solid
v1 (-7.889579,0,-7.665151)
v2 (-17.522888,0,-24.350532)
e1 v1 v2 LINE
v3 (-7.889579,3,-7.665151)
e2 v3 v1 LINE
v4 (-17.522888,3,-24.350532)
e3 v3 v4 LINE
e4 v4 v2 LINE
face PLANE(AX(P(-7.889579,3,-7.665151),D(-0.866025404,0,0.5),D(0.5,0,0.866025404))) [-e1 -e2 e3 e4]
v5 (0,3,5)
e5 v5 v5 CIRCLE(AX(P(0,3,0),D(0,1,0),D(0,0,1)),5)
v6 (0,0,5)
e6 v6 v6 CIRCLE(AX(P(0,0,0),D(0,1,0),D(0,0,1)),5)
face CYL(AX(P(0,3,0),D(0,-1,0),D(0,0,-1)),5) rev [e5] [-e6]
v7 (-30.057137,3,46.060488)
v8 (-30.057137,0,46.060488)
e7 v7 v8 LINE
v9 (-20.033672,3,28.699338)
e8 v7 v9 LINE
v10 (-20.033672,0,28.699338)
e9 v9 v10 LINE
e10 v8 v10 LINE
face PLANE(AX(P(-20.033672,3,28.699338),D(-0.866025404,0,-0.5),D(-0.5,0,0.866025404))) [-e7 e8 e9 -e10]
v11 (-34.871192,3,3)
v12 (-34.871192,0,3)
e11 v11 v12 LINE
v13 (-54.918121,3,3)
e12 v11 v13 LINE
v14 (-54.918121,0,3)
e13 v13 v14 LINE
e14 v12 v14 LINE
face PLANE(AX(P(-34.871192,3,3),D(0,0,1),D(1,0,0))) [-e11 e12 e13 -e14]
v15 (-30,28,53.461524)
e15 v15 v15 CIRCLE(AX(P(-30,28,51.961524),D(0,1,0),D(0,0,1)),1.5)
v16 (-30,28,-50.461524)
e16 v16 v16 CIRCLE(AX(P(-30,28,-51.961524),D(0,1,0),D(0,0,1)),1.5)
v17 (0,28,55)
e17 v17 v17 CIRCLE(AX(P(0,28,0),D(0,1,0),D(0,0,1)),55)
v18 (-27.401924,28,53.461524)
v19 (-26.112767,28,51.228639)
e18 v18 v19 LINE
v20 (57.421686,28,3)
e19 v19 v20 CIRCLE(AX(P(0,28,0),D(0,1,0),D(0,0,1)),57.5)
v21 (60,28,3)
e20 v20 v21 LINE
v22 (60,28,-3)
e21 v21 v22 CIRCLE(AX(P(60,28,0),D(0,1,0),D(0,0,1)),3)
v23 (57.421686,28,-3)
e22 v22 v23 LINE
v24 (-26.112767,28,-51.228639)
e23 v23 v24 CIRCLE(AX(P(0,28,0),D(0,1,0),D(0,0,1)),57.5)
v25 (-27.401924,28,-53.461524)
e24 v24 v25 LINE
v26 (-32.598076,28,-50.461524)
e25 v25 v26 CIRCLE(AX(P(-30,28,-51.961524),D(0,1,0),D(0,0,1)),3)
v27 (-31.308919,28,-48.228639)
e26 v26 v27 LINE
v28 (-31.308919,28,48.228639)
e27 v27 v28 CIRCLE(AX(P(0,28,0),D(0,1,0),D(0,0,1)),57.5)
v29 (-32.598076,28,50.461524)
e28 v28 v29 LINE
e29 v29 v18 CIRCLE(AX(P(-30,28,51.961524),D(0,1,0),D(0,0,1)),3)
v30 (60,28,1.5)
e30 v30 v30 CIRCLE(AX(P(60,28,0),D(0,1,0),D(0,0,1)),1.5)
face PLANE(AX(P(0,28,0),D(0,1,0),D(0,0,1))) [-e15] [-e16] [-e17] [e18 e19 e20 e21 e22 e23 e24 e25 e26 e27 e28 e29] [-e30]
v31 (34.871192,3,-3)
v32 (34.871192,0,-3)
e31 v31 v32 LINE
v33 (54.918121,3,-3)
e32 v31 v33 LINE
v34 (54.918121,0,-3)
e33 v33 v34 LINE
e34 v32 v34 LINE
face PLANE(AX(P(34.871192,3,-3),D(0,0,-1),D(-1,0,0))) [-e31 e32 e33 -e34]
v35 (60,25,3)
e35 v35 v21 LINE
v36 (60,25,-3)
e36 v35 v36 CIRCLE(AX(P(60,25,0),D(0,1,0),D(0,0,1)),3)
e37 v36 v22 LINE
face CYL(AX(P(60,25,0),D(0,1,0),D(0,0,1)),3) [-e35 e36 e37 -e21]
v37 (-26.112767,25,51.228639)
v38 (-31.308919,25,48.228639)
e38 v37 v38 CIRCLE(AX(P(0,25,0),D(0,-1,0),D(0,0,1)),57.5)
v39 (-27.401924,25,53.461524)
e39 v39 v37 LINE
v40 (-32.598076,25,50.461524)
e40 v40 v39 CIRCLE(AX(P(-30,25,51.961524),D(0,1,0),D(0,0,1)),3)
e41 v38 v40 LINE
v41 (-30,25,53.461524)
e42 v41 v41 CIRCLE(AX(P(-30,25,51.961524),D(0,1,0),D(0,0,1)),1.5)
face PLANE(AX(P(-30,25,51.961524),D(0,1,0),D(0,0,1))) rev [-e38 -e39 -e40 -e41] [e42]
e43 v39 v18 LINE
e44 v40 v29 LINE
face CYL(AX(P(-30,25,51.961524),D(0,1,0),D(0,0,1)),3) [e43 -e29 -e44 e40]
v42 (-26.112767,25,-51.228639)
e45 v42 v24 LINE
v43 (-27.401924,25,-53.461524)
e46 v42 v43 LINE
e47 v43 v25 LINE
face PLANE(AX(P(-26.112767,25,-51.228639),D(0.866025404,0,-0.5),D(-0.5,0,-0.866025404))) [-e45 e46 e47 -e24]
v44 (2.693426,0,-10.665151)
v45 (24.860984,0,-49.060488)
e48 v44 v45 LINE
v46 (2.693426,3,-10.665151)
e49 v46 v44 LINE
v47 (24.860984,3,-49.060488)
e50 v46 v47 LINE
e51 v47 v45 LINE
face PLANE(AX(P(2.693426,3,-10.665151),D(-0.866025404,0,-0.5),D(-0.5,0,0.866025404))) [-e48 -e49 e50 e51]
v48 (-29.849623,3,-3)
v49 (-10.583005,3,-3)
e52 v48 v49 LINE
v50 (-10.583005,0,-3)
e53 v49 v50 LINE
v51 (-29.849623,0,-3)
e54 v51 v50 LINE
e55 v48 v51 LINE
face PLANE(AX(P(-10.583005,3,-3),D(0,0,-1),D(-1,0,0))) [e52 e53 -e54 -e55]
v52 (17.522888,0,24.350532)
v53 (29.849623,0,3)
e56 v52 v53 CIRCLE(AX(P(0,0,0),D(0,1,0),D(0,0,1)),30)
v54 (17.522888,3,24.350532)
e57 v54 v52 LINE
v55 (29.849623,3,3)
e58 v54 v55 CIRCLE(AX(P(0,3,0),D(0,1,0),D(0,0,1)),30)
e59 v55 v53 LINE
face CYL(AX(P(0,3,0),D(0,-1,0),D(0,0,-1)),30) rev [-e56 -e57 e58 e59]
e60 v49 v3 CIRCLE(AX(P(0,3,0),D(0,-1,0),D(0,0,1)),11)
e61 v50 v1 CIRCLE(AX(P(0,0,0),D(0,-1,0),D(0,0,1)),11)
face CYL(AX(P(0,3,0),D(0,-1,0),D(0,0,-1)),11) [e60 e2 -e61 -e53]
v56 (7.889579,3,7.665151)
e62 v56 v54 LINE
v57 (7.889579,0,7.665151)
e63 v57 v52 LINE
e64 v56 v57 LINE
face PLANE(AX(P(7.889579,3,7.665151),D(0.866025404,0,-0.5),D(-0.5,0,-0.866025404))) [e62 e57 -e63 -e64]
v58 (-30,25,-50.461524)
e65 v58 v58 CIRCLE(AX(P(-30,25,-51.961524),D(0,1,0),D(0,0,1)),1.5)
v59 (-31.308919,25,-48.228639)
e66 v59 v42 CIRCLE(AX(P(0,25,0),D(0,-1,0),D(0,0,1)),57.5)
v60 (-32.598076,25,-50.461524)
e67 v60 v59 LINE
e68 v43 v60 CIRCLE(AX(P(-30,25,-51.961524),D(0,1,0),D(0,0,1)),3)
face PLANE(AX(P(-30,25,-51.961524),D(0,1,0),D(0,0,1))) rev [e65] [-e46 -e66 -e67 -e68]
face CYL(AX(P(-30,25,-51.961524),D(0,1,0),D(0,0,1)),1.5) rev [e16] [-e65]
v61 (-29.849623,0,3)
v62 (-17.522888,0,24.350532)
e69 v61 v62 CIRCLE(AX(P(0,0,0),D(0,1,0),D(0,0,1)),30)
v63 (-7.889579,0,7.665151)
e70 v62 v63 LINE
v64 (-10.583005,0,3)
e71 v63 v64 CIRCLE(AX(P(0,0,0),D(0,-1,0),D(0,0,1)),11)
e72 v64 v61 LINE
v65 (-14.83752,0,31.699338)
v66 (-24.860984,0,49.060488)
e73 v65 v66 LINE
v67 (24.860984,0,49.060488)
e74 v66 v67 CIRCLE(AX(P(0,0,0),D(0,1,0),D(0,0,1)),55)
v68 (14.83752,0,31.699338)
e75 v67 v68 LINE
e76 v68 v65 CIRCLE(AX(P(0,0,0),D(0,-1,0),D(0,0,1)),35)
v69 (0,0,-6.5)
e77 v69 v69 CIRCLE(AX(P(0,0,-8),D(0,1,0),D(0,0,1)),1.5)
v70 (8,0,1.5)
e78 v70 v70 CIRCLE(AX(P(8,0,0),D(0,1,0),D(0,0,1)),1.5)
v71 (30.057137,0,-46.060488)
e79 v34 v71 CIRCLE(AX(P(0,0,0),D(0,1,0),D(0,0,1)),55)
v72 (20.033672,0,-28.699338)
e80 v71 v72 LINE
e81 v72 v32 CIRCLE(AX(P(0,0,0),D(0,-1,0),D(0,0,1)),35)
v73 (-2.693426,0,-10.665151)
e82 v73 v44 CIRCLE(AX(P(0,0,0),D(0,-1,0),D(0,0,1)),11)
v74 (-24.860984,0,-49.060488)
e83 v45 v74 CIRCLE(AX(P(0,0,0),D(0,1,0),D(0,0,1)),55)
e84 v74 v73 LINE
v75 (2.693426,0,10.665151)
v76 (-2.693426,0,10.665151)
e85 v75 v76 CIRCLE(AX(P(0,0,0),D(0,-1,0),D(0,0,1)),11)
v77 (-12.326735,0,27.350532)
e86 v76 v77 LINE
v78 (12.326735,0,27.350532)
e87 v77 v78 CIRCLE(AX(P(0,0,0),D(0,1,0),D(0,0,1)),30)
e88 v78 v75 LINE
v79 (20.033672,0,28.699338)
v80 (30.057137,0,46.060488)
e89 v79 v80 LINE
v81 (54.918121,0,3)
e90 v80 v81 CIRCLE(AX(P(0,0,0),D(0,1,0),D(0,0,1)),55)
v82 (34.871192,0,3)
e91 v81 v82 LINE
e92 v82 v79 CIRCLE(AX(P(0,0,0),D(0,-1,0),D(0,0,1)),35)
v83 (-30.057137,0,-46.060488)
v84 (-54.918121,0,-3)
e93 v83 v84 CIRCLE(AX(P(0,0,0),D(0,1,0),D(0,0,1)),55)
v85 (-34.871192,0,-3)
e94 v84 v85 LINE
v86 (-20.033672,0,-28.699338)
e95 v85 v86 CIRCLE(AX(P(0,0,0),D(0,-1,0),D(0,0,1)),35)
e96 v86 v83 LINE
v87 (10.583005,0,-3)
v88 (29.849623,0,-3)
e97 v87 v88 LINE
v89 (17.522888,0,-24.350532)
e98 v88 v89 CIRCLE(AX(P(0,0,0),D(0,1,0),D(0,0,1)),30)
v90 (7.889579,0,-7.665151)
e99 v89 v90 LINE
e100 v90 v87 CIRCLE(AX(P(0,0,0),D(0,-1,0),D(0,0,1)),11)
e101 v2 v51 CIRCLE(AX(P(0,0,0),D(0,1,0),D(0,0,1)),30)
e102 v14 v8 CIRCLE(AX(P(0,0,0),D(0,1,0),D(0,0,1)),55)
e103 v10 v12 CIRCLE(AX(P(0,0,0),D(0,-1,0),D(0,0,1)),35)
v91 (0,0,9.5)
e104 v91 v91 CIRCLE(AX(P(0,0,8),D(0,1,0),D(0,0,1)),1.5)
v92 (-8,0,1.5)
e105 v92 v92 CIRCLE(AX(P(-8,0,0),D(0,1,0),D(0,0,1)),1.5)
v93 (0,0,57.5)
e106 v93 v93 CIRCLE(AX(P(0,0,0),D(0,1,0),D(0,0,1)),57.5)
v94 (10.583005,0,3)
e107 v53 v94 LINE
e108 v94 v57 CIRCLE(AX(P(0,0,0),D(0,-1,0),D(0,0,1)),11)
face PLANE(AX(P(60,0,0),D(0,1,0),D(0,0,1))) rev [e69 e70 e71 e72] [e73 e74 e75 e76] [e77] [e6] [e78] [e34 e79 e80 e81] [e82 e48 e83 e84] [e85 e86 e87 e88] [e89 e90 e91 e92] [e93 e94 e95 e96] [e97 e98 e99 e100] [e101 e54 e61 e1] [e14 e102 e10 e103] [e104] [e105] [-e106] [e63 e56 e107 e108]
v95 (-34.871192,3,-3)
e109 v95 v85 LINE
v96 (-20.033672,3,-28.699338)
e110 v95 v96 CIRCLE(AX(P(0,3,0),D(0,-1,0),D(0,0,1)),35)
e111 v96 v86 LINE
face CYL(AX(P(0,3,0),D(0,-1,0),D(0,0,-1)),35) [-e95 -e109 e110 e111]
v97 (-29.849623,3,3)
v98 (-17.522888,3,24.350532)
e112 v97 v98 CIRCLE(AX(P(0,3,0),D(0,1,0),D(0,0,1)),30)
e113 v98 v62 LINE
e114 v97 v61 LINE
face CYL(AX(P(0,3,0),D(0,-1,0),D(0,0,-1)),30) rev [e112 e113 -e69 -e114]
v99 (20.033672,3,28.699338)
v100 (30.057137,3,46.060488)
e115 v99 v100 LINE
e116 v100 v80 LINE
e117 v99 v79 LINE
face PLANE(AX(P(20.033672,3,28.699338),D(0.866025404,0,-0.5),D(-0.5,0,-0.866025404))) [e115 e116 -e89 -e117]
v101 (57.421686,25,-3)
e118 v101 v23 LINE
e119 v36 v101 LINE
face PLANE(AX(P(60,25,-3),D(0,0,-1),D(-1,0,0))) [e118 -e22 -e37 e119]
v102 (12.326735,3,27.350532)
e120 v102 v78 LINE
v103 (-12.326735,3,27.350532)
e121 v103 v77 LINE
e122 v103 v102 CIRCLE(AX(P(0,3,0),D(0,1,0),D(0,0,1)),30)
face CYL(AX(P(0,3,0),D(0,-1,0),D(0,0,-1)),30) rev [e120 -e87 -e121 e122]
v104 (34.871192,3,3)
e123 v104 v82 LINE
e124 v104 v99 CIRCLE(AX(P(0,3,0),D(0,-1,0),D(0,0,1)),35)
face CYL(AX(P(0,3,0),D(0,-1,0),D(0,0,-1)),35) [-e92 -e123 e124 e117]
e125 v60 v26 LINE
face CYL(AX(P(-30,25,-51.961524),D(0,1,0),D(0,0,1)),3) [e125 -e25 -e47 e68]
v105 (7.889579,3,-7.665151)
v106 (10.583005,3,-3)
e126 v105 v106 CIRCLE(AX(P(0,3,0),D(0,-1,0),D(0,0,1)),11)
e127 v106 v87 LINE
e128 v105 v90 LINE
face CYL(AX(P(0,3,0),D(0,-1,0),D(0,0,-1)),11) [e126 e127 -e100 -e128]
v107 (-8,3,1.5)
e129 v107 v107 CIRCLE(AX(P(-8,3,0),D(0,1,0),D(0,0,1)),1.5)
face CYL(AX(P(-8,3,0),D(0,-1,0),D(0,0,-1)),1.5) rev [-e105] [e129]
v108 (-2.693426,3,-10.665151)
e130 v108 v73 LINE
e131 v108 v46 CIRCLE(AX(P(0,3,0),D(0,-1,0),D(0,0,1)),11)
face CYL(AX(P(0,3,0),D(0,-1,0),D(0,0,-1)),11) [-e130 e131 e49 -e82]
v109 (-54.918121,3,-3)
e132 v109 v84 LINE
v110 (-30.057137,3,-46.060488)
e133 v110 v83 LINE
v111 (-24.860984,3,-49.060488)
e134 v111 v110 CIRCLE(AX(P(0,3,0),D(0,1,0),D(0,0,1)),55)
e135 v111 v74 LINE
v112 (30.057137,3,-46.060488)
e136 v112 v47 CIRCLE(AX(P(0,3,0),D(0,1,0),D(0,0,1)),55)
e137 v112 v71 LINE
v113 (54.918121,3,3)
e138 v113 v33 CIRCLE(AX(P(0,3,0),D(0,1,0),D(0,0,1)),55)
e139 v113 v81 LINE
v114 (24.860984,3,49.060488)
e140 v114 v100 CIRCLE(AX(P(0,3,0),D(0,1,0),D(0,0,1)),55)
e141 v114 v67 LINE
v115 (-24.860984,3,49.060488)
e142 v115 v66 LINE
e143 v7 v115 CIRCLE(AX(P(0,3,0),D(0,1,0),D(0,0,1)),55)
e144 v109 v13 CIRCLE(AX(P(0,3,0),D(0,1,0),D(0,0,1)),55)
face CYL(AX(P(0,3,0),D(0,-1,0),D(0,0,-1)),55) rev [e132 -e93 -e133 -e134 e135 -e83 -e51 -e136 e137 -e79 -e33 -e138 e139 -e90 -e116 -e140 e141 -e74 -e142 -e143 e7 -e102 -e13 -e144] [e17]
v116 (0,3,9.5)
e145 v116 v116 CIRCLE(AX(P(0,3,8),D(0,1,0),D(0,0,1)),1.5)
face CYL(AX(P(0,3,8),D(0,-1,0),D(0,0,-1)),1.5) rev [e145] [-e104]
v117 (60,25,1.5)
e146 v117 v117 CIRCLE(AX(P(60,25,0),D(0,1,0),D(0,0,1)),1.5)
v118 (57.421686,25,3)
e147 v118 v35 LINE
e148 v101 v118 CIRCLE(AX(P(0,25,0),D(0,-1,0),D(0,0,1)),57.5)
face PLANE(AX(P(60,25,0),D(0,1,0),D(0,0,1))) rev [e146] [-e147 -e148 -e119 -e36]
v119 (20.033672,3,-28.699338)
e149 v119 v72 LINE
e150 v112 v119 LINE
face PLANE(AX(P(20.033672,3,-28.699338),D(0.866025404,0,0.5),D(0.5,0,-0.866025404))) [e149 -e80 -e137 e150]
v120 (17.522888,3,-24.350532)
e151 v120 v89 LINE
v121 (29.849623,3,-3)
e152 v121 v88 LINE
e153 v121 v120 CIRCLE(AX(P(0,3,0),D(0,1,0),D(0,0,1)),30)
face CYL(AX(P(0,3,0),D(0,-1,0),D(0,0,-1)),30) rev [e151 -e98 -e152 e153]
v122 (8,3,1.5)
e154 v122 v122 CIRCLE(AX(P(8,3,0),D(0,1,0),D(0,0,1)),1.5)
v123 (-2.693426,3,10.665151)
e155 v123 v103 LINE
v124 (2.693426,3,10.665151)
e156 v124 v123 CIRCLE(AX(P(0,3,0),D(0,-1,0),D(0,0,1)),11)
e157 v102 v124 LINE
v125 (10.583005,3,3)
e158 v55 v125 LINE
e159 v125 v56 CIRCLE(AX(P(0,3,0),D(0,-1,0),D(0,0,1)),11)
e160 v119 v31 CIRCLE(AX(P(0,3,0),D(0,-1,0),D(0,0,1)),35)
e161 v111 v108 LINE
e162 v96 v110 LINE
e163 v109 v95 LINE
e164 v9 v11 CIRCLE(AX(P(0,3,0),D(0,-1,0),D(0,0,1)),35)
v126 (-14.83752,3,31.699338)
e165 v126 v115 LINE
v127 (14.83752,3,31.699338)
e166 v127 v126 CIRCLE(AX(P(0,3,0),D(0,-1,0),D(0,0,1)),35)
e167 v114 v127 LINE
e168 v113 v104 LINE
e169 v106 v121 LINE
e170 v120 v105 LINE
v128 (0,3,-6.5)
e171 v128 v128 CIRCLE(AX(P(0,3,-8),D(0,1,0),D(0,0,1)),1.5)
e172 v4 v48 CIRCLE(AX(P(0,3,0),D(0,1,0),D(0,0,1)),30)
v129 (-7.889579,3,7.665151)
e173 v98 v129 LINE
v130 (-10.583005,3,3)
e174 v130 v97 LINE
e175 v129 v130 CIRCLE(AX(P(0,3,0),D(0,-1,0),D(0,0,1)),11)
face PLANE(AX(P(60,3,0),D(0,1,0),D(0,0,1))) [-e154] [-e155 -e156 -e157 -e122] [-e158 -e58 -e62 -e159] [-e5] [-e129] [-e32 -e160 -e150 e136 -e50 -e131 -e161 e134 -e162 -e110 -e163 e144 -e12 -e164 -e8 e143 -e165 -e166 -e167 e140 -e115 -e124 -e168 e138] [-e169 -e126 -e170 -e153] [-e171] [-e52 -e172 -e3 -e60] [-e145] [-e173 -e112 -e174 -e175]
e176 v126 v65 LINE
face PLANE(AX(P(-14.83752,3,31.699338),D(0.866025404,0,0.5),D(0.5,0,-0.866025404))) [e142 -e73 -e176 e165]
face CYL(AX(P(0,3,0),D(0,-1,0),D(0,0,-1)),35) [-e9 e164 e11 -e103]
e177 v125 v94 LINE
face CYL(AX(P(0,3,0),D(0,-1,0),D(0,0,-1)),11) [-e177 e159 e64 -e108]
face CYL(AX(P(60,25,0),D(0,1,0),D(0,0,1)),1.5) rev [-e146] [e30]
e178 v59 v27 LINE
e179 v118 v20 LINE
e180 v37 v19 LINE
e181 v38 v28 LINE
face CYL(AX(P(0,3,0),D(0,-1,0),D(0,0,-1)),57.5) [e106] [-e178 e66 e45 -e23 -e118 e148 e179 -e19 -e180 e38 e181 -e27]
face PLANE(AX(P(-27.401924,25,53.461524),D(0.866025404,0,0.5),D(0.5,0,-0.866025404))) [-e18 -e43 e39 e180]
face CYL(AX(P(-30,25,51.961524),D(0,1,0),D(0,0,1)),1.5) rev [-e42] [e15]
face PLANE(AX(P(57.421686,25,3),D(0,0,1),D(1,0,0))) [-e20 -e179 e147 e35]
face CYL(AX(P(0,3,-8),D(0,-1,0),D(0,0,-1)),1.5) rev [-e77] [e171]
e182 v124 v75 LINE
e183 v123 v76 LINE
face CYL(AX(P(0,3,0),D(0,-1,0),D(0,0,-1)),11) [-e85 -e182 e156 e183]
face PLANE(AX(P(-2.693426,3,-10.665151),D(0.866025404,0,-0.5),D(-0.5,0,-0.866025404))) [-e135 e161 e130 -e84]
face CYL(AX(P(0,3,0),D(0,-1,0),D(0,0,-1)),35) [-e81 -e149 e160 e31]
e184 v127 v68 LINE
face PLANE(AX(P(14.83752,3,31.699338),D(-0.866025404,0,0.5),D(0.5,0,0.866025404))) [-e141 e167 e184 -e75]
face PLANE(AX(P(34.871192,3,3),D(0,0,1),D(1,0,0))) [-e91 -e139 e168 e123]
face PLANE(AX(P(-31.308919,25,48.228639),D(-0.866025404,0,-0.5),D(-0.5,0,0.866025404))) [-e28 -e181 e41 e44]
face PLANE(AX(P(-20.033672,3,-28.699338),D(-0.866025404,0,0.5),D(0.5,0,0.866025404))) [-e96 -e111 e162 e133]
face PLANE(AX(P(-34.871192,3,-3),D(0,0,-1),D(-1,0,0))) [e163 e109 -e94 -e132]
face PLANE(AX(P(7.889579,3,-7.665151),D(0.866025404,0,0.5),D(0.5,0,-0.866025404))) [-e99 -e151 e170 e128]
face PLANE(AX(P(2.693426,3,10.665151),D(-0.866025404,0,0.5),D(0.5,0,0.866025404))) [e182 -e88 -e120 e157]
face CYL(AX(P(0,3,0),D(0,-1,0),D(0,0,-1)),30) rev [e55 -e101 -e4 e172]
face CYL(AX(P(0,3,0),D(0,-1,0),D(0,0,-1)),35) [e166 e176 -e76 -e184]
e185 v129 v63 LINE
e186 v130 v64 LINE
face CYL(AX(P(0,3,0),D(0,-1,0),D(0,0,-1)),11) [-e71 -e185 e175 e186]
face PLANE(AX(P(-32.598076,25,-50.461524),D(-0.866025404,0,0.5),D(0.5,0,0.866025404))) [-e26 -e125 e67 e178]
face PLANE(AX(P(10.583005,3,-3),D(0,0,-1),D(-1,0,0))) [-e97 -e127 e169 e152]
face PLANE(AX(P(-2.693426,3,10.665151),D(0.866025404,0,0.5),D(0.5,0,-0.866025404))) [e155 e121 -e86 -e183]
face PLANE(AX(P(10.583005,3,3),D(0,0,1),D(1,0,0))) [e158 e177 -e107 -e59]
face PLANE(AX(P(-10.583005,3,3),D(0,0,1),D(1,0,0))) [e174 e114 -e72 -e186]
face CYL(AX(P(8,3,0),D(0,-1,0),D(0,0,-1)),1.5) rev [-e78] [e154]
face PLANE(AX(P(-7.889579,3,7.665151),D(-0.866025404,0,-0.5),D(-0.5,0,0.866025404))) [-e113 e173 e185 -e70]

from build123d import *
from build123d.topology import SkipClean

# Parameters (mm, degrees)
SKETCH_1_R          = 1.5
SKETCH_1_R_2        = 5
EXTRUDE_1_DEPTH     = 3
SKETCH_2_R          = 57.5
SKETCH_2_R_2        = 55
EXTRUDE_2_DEPTH     = 25
EXTRUDE_START       = -3
SKETCH_3_R          = 1.5
EXTRUDE_3_DEPTH     = 3
CUT_EXTRUDE_START   = -30
SKETCH_4_R          = 69.475087651
SKETCH_4_R_2        = 57.5
CUT_EXTRUDE_1_DEPTH = 30
CUT_EXTRUDE_2_DEPTH = 10


with BuildPart() as part:
    # 草图1 → 凸台-拉伸1 (new body)
    with BuildSketch(Plane(origin=(0, 0, 0), x_dir=(1, 0, 0), z_dir=(0, 1, 0))):
        with BuildLine():
            Line((57.421685799, 3), (60, 3))
            ThreePointArc((60, 3), (63, 0), (60, -3))
            Line((60, -3), (57.421685799, -3))
            ThreePointArc((57.421685799, -3), (28.75, -49.796460718), (-26.112766688, -51.22863863))
            Line((-26.112766688, -51.22863863), (-27.401923789, -53.461524227))
            ThreePointArc((-27.401923789, -53.461524227), (-31.5, -54.559600438), (-32.598076211, -50.461524227))
            Line((-32.598076211, -50.461524227), (-31.308919111, -48.22863863))
            ThreePointArc((-31.308919111, -48.22863863), (-57.5, 0), (-31.308919111, 48.22863863))
            Line((-31.308919111, 48.22863863), (-32.598076211, 50.461524227))
            ThreePointArc((-32.598076211, 50.461524227), (-31.5, 54.559600438), (-27.401923789, 53.461524227))
            Line((-27.401923789, 53.461524227), (-26.112766688, 51.22863863))
            ThreePointArc((-26.112766688, 51.22863863), (28.75, 49.796460718), (57.421685799, 3))
        make_face()
        with Locations((0, 8)):
            Circle(SKETCH_1_R, mode=Mode.SUBTRACT)
        with Locations((8, 0)):
            Circle(SKETCH_1_R, mode=Mode.SUBTRACT)
        with Locations((0, -8)):
            Circle(SKETCH_1_R, mode=Mode.SUBTRACT)
        with Locations((-8, 0)):
            Circle(SKETCH_1_R, mode=Mode.SUBTRACT)
        Circle(SKETCH_1_R_2, mode=Mode.SUBTRACT)
        with Locations((60, 0)):
            Circle(SKETCH_1_R, mode=Mode.SUBTRACT)
        with Locations((-30, -51.961524227)):
            Circle(SKETCH_1_R, mode=Mode.SUBTRACT)
        with Locations((-30, 51.961524227)):
            Circle(SKETCH_1_R, mode=Mode.SUBTRACT)
        with BuildLine():
            Line((10.583005244, 3), (29.849623113, 3))
            ThreePointArc((29.849623113, 3), (25.980762114, 15), (17.522887768, 24.350531909))
            Line((17.522887768, 24.350531909), (7.889578833, 7.66515139))
            ThreePointArc((7.889578833, 7.66515139), (9.526279442, 5.5), (10.583005244, 3))
        make_face(mode=Mode.SUBTRACT)
        with BuildLine():
            Line((10.583005244, -3), (29.849623113, -3))
            ThreePointArc((29.849623113, -3), (25.980762114, -15), (17.522887768, -24.350531909))
            Line((17.522887768, -24.350531909), (7.889578833, -7.66515139))
            ThreePointArc((7.889578833, -7.66515139), (9.526279442, -5.5), (10.583005244, -3))
        make_face(mode=Mode.SUBTRACT)
        with BuildLine():
            Line((2.693426411, -10.66515139), (12.326735345, -27.350531909))
            ThreePointArc((12.326735345, -27.350531909), (0, -30), (-12.326735345, -27.350531909))
            Line((-12.326735345, -27.350531909), (-2.693426411, -10.66515139))
            ThreePointArc((-2.693426411, -10.66515139), (0, -11), (2.693426411, -10.66515139))
        make_face(mode=Mode.SUBTRACT)
        with BuildLine():
            Line((-14.837519563, 31.699337741), (-24.860984224, 49.060487802))
            ThreePointArc((-24.860984224, 49.060487802), (0, 55), (24.860984224, 49.060487802))
            Line((24.860984224, 49.060487802), (14.837519563, 31.699337741))
            ThreePointArc((14.837519563, 31.699337741), (0, 35), (-14.837519563, 31.699337741))
        make_face(mode=Mode.SUBTRACT)
        with BuildLine():
            Line((-7.889578833, -7.66515139), (-17.522887768, -24.350531909))
            ThreePointArc((-17.522887768, -24.350531909), (-25.980762114, -15), (-29.849623113, -3))
            Line((-29.849623113, -3), (-10.583005244, -3))
            ThreePointArc((-10.583005244, -3), (-9.526279442, -5.5), (-7.889578833, -7.66515139))
        make_face(mode=Mode.SUBTRACT)
        with BuildLine():
            Line((-10.583005244, 3), (-29.849623113, 3))
            ThreePointArc((-29.849623113, 3), (-25.980762114, 15), (-17.522887768, 24.350531909))
            Line((-17.522887768, 24.350531909), (-7.889578833, 7.66515139))
            ThreePointArc((-7.889578833, 7.66515139), (-9.526279442, 5.5), (-10.583005244, 3))
        make_face(mode=Mode.SUBTRACT)
        with BuildLine():
            Line((20.033671986, 28.699337741), (30.057136647, 46.060487802))
            ThreePointArc((30.057136647, 46.060487802), (47.631397208, 27.5), (54.918120871, 3))
            Line((54.918120871, 3), (34.871191548, 3))
            ThreePointArc((34.871191548, 3), (30.310889132, 17.5), (20.033671986, 28.699337741))
        make_face(mode=Mode.SUBTRACT)
        with BuildLine():
            Line((-20.033671986, 28.699337741), (-30.057136647, 46.060487802))
            ThreePointArc((-30.057136647, 46.060487802), (-47.631397208, 27.5), (-54.918120871, 3))
            Line((-54.918120871, 3), (-34.871191548, 3))
            ThreePointArc((-34.871191548, 3), (-30.310889132, 17.5), (-20.033671986, 28.699337741))
        make_face(mode=Mode.SUBTRACT)
        with BuildLine():
            Line((-2.693426411, 10.66515139), (-12.326735345, 27.350531909))
            ThreePointArc((-12.326735345, 27.350531909), (0, 30), (12.326735345, 27.350531909))
            Line((12.326735345, 27.350531909), (2.693426411, 10.66515139))
            ThreePointArc((2.693426411, 10.66515139), (0, 11), (-2.693426411, 10.66515139))
        make_face(mode=Mode.SUBTRACT)
        with BuildLine():
            Line((-34.871191548, -3), (-54.918120871, -3))
            ThreePointArc((-54.918120871, -3), (-47.631397208, -27.5), (-30.057136647, -46.060487802))
            Line((-30.057136647, -46.060487802), (-20.033671986, -28.699337741))
            ThreePointArc((-20.033671986, -28.699337741), (-30.310889132, -17.5), (-34.871191548, -3))
        make_face(mode=Mode.SUBTRACT)
        with BuildLine():
            Line((34.871191548, -3), (54.918120871, -3))
            ThreePointArc((54.918120871, -3), (47.631397208, -27.5), (30.057136647, -46.060487802))
            Line((30.057136647, -46.060487802), (20.033671986, -28.699337741))
            ThreePointArc((20.033671986, -28.699337741), (30.310889132, -17.5), (34.871191548, -3))
        make_face(mode=Mode.SUBTRACT)
        with BuildLine():
            Line((14.837519563, -31.699337741), (24.860984224, -49.060487802))
            ThreePointArc((24.860984224, -49.060487802), (0, -55), (-24.860984224, -49.060487802))
            Line((-24.860984224, -49.060487802), (-14.837519563, -31.699337741))
            ThreePointArc((-14.837519563, -31.699337741), (0, -35), (14.837519563, -31.699337741))
        make_face(mode=Mode.SUBTRACT)
    extrude(amount=EXTRUDE_1_DEPTH)

    # 草图2 → 凸台-拉伸2 (add)
    with SkipClean():  # the faces are left unmerged after this step: merging them gives an invalid solid
        with BuildSketch(Plane(origin=(0, 3, 0), x_dir=(1, 0, 0), z_dir=(0, 1, 0))):
            Circle(SKETCH_2_R)
            Circle(SKETCH_2_R_2, mode=Mode.SUBTRACT)
        extrude(amount=EXTRUDE_2_DEPTH)
    add(part.part.scale(1), mode=Mode.REPLACE)  # the faces are merged on a copy

    # 草图3 → 凸台-拉伸3 (add)
    # profile 1 of 3: a face of its own
    with SkipClean():  # the faces are left unmerged after this step: merging them gives an invalid solid
        with BuildSketch(Plane(origin=(0, 28, 0), x_dir=(1, 0, 0), z_dir=(0, 1, 0)).offset(EXTRUDE_START)):
            with BuildLine():
                Line((-32.598076211, 50.461524227), (-31.308919111, 48.22863863))
                ThreePointArc((-31.308919111, 48.22863863), (-28.75, 49.796460718), (-26.112766688, 51.22863863))
                Line((-26.112766688, 51.22863863), (-27.401923789, 53.461524227))
                ThreePointArc((-27.401923789, 53.461524227), (-31.5, 54.559600438), (-32.598076211, 50.461524227))
            make_face()
            with Locations((-30, 51.961524227)):
                Circle(SKETCH_3_R, mode=Mode.SUBTRACT)
        # profile 2 of 3: a face of its own
        with BuildSketch(Plane(origin=(0, 28, 0), x_dir=(1, 0, 0), z_dir=(0, 1, 0)).offset(EXTRUDE_START)):
            with BuildLine():
                Line((60, 3), (57.421685799, 3))
                ThreePointArc((57.421685799, 3), (57.5, 0), (57.421685799, -3))
                Line((57.421685799, -3), (60, -3))
                ThreePointArc((60, -3), (63, 0), (60, 3))
            make_face()
            with Locations((60, 0)):
                Circle(SKETCH_3_R, mode=Mode.SUBTRACT)
        # profile 3 of 3: a face of its own
        with BuildSketch(Plane(origin=(0, 28, 0), x_dir=(1, 0, 0), z_dir=(0, 1, 0)).offset(EXTRUDE_START)):
            with BuildLine():
                Line((-27.401923789, -53.461524227), (-26.112766688, -51.22863863))
                ThreePointArc((-26.112766688, -51.22863863), (-28.75, -49.796460718), (-31.308919111, -48.22863863))
                Line((-31.308919111, -48.22863863), (-32.598076211, -50.461524227))
                ThreePointArc((-32.598076211, -50.461524227), (-31.5, -54.559600438), (-27.401923789, -53.461524227))
            make_face()
            with Locations((-30, -51.961524227)):
                Circle(SKETCH_3_R, mode=Mode.SUBTRACT)
        extrude(amount=EXTRUDE_3_DEPTH)

    # 草图4 → 切除-拉伸1 (cut)
    with BuildSketch(Plane(origin=(0, 3, 0), x_dir=(1, 0, 0), z_dir=(0, 1, 0)).offset(CUT_EXTRUDE_START)):
        Circle(SKETCH_4_R)
        Circle(SKETCH_4_R_2, mode=Mode.SUBTRACT)
    extrude(amount=CUT_EXTRUDE_1_DEPTH, mode=Mode.SUBTRACT)

    # 草图5 → 切除-拉伸2 (cut)
    with BuildSketch(Plane.XZ):
        Polygon((-20.031496469, -40.695569636), (-10.067965636, -23.43822801), (9.224847601, -21.977904737), (20.031496469, -40.695569636), align=None)
    extrude(amount=-CUT_EXTRUDE_2_DEPTH, mode=Mode.SUBTRACT)


solid = part.part
